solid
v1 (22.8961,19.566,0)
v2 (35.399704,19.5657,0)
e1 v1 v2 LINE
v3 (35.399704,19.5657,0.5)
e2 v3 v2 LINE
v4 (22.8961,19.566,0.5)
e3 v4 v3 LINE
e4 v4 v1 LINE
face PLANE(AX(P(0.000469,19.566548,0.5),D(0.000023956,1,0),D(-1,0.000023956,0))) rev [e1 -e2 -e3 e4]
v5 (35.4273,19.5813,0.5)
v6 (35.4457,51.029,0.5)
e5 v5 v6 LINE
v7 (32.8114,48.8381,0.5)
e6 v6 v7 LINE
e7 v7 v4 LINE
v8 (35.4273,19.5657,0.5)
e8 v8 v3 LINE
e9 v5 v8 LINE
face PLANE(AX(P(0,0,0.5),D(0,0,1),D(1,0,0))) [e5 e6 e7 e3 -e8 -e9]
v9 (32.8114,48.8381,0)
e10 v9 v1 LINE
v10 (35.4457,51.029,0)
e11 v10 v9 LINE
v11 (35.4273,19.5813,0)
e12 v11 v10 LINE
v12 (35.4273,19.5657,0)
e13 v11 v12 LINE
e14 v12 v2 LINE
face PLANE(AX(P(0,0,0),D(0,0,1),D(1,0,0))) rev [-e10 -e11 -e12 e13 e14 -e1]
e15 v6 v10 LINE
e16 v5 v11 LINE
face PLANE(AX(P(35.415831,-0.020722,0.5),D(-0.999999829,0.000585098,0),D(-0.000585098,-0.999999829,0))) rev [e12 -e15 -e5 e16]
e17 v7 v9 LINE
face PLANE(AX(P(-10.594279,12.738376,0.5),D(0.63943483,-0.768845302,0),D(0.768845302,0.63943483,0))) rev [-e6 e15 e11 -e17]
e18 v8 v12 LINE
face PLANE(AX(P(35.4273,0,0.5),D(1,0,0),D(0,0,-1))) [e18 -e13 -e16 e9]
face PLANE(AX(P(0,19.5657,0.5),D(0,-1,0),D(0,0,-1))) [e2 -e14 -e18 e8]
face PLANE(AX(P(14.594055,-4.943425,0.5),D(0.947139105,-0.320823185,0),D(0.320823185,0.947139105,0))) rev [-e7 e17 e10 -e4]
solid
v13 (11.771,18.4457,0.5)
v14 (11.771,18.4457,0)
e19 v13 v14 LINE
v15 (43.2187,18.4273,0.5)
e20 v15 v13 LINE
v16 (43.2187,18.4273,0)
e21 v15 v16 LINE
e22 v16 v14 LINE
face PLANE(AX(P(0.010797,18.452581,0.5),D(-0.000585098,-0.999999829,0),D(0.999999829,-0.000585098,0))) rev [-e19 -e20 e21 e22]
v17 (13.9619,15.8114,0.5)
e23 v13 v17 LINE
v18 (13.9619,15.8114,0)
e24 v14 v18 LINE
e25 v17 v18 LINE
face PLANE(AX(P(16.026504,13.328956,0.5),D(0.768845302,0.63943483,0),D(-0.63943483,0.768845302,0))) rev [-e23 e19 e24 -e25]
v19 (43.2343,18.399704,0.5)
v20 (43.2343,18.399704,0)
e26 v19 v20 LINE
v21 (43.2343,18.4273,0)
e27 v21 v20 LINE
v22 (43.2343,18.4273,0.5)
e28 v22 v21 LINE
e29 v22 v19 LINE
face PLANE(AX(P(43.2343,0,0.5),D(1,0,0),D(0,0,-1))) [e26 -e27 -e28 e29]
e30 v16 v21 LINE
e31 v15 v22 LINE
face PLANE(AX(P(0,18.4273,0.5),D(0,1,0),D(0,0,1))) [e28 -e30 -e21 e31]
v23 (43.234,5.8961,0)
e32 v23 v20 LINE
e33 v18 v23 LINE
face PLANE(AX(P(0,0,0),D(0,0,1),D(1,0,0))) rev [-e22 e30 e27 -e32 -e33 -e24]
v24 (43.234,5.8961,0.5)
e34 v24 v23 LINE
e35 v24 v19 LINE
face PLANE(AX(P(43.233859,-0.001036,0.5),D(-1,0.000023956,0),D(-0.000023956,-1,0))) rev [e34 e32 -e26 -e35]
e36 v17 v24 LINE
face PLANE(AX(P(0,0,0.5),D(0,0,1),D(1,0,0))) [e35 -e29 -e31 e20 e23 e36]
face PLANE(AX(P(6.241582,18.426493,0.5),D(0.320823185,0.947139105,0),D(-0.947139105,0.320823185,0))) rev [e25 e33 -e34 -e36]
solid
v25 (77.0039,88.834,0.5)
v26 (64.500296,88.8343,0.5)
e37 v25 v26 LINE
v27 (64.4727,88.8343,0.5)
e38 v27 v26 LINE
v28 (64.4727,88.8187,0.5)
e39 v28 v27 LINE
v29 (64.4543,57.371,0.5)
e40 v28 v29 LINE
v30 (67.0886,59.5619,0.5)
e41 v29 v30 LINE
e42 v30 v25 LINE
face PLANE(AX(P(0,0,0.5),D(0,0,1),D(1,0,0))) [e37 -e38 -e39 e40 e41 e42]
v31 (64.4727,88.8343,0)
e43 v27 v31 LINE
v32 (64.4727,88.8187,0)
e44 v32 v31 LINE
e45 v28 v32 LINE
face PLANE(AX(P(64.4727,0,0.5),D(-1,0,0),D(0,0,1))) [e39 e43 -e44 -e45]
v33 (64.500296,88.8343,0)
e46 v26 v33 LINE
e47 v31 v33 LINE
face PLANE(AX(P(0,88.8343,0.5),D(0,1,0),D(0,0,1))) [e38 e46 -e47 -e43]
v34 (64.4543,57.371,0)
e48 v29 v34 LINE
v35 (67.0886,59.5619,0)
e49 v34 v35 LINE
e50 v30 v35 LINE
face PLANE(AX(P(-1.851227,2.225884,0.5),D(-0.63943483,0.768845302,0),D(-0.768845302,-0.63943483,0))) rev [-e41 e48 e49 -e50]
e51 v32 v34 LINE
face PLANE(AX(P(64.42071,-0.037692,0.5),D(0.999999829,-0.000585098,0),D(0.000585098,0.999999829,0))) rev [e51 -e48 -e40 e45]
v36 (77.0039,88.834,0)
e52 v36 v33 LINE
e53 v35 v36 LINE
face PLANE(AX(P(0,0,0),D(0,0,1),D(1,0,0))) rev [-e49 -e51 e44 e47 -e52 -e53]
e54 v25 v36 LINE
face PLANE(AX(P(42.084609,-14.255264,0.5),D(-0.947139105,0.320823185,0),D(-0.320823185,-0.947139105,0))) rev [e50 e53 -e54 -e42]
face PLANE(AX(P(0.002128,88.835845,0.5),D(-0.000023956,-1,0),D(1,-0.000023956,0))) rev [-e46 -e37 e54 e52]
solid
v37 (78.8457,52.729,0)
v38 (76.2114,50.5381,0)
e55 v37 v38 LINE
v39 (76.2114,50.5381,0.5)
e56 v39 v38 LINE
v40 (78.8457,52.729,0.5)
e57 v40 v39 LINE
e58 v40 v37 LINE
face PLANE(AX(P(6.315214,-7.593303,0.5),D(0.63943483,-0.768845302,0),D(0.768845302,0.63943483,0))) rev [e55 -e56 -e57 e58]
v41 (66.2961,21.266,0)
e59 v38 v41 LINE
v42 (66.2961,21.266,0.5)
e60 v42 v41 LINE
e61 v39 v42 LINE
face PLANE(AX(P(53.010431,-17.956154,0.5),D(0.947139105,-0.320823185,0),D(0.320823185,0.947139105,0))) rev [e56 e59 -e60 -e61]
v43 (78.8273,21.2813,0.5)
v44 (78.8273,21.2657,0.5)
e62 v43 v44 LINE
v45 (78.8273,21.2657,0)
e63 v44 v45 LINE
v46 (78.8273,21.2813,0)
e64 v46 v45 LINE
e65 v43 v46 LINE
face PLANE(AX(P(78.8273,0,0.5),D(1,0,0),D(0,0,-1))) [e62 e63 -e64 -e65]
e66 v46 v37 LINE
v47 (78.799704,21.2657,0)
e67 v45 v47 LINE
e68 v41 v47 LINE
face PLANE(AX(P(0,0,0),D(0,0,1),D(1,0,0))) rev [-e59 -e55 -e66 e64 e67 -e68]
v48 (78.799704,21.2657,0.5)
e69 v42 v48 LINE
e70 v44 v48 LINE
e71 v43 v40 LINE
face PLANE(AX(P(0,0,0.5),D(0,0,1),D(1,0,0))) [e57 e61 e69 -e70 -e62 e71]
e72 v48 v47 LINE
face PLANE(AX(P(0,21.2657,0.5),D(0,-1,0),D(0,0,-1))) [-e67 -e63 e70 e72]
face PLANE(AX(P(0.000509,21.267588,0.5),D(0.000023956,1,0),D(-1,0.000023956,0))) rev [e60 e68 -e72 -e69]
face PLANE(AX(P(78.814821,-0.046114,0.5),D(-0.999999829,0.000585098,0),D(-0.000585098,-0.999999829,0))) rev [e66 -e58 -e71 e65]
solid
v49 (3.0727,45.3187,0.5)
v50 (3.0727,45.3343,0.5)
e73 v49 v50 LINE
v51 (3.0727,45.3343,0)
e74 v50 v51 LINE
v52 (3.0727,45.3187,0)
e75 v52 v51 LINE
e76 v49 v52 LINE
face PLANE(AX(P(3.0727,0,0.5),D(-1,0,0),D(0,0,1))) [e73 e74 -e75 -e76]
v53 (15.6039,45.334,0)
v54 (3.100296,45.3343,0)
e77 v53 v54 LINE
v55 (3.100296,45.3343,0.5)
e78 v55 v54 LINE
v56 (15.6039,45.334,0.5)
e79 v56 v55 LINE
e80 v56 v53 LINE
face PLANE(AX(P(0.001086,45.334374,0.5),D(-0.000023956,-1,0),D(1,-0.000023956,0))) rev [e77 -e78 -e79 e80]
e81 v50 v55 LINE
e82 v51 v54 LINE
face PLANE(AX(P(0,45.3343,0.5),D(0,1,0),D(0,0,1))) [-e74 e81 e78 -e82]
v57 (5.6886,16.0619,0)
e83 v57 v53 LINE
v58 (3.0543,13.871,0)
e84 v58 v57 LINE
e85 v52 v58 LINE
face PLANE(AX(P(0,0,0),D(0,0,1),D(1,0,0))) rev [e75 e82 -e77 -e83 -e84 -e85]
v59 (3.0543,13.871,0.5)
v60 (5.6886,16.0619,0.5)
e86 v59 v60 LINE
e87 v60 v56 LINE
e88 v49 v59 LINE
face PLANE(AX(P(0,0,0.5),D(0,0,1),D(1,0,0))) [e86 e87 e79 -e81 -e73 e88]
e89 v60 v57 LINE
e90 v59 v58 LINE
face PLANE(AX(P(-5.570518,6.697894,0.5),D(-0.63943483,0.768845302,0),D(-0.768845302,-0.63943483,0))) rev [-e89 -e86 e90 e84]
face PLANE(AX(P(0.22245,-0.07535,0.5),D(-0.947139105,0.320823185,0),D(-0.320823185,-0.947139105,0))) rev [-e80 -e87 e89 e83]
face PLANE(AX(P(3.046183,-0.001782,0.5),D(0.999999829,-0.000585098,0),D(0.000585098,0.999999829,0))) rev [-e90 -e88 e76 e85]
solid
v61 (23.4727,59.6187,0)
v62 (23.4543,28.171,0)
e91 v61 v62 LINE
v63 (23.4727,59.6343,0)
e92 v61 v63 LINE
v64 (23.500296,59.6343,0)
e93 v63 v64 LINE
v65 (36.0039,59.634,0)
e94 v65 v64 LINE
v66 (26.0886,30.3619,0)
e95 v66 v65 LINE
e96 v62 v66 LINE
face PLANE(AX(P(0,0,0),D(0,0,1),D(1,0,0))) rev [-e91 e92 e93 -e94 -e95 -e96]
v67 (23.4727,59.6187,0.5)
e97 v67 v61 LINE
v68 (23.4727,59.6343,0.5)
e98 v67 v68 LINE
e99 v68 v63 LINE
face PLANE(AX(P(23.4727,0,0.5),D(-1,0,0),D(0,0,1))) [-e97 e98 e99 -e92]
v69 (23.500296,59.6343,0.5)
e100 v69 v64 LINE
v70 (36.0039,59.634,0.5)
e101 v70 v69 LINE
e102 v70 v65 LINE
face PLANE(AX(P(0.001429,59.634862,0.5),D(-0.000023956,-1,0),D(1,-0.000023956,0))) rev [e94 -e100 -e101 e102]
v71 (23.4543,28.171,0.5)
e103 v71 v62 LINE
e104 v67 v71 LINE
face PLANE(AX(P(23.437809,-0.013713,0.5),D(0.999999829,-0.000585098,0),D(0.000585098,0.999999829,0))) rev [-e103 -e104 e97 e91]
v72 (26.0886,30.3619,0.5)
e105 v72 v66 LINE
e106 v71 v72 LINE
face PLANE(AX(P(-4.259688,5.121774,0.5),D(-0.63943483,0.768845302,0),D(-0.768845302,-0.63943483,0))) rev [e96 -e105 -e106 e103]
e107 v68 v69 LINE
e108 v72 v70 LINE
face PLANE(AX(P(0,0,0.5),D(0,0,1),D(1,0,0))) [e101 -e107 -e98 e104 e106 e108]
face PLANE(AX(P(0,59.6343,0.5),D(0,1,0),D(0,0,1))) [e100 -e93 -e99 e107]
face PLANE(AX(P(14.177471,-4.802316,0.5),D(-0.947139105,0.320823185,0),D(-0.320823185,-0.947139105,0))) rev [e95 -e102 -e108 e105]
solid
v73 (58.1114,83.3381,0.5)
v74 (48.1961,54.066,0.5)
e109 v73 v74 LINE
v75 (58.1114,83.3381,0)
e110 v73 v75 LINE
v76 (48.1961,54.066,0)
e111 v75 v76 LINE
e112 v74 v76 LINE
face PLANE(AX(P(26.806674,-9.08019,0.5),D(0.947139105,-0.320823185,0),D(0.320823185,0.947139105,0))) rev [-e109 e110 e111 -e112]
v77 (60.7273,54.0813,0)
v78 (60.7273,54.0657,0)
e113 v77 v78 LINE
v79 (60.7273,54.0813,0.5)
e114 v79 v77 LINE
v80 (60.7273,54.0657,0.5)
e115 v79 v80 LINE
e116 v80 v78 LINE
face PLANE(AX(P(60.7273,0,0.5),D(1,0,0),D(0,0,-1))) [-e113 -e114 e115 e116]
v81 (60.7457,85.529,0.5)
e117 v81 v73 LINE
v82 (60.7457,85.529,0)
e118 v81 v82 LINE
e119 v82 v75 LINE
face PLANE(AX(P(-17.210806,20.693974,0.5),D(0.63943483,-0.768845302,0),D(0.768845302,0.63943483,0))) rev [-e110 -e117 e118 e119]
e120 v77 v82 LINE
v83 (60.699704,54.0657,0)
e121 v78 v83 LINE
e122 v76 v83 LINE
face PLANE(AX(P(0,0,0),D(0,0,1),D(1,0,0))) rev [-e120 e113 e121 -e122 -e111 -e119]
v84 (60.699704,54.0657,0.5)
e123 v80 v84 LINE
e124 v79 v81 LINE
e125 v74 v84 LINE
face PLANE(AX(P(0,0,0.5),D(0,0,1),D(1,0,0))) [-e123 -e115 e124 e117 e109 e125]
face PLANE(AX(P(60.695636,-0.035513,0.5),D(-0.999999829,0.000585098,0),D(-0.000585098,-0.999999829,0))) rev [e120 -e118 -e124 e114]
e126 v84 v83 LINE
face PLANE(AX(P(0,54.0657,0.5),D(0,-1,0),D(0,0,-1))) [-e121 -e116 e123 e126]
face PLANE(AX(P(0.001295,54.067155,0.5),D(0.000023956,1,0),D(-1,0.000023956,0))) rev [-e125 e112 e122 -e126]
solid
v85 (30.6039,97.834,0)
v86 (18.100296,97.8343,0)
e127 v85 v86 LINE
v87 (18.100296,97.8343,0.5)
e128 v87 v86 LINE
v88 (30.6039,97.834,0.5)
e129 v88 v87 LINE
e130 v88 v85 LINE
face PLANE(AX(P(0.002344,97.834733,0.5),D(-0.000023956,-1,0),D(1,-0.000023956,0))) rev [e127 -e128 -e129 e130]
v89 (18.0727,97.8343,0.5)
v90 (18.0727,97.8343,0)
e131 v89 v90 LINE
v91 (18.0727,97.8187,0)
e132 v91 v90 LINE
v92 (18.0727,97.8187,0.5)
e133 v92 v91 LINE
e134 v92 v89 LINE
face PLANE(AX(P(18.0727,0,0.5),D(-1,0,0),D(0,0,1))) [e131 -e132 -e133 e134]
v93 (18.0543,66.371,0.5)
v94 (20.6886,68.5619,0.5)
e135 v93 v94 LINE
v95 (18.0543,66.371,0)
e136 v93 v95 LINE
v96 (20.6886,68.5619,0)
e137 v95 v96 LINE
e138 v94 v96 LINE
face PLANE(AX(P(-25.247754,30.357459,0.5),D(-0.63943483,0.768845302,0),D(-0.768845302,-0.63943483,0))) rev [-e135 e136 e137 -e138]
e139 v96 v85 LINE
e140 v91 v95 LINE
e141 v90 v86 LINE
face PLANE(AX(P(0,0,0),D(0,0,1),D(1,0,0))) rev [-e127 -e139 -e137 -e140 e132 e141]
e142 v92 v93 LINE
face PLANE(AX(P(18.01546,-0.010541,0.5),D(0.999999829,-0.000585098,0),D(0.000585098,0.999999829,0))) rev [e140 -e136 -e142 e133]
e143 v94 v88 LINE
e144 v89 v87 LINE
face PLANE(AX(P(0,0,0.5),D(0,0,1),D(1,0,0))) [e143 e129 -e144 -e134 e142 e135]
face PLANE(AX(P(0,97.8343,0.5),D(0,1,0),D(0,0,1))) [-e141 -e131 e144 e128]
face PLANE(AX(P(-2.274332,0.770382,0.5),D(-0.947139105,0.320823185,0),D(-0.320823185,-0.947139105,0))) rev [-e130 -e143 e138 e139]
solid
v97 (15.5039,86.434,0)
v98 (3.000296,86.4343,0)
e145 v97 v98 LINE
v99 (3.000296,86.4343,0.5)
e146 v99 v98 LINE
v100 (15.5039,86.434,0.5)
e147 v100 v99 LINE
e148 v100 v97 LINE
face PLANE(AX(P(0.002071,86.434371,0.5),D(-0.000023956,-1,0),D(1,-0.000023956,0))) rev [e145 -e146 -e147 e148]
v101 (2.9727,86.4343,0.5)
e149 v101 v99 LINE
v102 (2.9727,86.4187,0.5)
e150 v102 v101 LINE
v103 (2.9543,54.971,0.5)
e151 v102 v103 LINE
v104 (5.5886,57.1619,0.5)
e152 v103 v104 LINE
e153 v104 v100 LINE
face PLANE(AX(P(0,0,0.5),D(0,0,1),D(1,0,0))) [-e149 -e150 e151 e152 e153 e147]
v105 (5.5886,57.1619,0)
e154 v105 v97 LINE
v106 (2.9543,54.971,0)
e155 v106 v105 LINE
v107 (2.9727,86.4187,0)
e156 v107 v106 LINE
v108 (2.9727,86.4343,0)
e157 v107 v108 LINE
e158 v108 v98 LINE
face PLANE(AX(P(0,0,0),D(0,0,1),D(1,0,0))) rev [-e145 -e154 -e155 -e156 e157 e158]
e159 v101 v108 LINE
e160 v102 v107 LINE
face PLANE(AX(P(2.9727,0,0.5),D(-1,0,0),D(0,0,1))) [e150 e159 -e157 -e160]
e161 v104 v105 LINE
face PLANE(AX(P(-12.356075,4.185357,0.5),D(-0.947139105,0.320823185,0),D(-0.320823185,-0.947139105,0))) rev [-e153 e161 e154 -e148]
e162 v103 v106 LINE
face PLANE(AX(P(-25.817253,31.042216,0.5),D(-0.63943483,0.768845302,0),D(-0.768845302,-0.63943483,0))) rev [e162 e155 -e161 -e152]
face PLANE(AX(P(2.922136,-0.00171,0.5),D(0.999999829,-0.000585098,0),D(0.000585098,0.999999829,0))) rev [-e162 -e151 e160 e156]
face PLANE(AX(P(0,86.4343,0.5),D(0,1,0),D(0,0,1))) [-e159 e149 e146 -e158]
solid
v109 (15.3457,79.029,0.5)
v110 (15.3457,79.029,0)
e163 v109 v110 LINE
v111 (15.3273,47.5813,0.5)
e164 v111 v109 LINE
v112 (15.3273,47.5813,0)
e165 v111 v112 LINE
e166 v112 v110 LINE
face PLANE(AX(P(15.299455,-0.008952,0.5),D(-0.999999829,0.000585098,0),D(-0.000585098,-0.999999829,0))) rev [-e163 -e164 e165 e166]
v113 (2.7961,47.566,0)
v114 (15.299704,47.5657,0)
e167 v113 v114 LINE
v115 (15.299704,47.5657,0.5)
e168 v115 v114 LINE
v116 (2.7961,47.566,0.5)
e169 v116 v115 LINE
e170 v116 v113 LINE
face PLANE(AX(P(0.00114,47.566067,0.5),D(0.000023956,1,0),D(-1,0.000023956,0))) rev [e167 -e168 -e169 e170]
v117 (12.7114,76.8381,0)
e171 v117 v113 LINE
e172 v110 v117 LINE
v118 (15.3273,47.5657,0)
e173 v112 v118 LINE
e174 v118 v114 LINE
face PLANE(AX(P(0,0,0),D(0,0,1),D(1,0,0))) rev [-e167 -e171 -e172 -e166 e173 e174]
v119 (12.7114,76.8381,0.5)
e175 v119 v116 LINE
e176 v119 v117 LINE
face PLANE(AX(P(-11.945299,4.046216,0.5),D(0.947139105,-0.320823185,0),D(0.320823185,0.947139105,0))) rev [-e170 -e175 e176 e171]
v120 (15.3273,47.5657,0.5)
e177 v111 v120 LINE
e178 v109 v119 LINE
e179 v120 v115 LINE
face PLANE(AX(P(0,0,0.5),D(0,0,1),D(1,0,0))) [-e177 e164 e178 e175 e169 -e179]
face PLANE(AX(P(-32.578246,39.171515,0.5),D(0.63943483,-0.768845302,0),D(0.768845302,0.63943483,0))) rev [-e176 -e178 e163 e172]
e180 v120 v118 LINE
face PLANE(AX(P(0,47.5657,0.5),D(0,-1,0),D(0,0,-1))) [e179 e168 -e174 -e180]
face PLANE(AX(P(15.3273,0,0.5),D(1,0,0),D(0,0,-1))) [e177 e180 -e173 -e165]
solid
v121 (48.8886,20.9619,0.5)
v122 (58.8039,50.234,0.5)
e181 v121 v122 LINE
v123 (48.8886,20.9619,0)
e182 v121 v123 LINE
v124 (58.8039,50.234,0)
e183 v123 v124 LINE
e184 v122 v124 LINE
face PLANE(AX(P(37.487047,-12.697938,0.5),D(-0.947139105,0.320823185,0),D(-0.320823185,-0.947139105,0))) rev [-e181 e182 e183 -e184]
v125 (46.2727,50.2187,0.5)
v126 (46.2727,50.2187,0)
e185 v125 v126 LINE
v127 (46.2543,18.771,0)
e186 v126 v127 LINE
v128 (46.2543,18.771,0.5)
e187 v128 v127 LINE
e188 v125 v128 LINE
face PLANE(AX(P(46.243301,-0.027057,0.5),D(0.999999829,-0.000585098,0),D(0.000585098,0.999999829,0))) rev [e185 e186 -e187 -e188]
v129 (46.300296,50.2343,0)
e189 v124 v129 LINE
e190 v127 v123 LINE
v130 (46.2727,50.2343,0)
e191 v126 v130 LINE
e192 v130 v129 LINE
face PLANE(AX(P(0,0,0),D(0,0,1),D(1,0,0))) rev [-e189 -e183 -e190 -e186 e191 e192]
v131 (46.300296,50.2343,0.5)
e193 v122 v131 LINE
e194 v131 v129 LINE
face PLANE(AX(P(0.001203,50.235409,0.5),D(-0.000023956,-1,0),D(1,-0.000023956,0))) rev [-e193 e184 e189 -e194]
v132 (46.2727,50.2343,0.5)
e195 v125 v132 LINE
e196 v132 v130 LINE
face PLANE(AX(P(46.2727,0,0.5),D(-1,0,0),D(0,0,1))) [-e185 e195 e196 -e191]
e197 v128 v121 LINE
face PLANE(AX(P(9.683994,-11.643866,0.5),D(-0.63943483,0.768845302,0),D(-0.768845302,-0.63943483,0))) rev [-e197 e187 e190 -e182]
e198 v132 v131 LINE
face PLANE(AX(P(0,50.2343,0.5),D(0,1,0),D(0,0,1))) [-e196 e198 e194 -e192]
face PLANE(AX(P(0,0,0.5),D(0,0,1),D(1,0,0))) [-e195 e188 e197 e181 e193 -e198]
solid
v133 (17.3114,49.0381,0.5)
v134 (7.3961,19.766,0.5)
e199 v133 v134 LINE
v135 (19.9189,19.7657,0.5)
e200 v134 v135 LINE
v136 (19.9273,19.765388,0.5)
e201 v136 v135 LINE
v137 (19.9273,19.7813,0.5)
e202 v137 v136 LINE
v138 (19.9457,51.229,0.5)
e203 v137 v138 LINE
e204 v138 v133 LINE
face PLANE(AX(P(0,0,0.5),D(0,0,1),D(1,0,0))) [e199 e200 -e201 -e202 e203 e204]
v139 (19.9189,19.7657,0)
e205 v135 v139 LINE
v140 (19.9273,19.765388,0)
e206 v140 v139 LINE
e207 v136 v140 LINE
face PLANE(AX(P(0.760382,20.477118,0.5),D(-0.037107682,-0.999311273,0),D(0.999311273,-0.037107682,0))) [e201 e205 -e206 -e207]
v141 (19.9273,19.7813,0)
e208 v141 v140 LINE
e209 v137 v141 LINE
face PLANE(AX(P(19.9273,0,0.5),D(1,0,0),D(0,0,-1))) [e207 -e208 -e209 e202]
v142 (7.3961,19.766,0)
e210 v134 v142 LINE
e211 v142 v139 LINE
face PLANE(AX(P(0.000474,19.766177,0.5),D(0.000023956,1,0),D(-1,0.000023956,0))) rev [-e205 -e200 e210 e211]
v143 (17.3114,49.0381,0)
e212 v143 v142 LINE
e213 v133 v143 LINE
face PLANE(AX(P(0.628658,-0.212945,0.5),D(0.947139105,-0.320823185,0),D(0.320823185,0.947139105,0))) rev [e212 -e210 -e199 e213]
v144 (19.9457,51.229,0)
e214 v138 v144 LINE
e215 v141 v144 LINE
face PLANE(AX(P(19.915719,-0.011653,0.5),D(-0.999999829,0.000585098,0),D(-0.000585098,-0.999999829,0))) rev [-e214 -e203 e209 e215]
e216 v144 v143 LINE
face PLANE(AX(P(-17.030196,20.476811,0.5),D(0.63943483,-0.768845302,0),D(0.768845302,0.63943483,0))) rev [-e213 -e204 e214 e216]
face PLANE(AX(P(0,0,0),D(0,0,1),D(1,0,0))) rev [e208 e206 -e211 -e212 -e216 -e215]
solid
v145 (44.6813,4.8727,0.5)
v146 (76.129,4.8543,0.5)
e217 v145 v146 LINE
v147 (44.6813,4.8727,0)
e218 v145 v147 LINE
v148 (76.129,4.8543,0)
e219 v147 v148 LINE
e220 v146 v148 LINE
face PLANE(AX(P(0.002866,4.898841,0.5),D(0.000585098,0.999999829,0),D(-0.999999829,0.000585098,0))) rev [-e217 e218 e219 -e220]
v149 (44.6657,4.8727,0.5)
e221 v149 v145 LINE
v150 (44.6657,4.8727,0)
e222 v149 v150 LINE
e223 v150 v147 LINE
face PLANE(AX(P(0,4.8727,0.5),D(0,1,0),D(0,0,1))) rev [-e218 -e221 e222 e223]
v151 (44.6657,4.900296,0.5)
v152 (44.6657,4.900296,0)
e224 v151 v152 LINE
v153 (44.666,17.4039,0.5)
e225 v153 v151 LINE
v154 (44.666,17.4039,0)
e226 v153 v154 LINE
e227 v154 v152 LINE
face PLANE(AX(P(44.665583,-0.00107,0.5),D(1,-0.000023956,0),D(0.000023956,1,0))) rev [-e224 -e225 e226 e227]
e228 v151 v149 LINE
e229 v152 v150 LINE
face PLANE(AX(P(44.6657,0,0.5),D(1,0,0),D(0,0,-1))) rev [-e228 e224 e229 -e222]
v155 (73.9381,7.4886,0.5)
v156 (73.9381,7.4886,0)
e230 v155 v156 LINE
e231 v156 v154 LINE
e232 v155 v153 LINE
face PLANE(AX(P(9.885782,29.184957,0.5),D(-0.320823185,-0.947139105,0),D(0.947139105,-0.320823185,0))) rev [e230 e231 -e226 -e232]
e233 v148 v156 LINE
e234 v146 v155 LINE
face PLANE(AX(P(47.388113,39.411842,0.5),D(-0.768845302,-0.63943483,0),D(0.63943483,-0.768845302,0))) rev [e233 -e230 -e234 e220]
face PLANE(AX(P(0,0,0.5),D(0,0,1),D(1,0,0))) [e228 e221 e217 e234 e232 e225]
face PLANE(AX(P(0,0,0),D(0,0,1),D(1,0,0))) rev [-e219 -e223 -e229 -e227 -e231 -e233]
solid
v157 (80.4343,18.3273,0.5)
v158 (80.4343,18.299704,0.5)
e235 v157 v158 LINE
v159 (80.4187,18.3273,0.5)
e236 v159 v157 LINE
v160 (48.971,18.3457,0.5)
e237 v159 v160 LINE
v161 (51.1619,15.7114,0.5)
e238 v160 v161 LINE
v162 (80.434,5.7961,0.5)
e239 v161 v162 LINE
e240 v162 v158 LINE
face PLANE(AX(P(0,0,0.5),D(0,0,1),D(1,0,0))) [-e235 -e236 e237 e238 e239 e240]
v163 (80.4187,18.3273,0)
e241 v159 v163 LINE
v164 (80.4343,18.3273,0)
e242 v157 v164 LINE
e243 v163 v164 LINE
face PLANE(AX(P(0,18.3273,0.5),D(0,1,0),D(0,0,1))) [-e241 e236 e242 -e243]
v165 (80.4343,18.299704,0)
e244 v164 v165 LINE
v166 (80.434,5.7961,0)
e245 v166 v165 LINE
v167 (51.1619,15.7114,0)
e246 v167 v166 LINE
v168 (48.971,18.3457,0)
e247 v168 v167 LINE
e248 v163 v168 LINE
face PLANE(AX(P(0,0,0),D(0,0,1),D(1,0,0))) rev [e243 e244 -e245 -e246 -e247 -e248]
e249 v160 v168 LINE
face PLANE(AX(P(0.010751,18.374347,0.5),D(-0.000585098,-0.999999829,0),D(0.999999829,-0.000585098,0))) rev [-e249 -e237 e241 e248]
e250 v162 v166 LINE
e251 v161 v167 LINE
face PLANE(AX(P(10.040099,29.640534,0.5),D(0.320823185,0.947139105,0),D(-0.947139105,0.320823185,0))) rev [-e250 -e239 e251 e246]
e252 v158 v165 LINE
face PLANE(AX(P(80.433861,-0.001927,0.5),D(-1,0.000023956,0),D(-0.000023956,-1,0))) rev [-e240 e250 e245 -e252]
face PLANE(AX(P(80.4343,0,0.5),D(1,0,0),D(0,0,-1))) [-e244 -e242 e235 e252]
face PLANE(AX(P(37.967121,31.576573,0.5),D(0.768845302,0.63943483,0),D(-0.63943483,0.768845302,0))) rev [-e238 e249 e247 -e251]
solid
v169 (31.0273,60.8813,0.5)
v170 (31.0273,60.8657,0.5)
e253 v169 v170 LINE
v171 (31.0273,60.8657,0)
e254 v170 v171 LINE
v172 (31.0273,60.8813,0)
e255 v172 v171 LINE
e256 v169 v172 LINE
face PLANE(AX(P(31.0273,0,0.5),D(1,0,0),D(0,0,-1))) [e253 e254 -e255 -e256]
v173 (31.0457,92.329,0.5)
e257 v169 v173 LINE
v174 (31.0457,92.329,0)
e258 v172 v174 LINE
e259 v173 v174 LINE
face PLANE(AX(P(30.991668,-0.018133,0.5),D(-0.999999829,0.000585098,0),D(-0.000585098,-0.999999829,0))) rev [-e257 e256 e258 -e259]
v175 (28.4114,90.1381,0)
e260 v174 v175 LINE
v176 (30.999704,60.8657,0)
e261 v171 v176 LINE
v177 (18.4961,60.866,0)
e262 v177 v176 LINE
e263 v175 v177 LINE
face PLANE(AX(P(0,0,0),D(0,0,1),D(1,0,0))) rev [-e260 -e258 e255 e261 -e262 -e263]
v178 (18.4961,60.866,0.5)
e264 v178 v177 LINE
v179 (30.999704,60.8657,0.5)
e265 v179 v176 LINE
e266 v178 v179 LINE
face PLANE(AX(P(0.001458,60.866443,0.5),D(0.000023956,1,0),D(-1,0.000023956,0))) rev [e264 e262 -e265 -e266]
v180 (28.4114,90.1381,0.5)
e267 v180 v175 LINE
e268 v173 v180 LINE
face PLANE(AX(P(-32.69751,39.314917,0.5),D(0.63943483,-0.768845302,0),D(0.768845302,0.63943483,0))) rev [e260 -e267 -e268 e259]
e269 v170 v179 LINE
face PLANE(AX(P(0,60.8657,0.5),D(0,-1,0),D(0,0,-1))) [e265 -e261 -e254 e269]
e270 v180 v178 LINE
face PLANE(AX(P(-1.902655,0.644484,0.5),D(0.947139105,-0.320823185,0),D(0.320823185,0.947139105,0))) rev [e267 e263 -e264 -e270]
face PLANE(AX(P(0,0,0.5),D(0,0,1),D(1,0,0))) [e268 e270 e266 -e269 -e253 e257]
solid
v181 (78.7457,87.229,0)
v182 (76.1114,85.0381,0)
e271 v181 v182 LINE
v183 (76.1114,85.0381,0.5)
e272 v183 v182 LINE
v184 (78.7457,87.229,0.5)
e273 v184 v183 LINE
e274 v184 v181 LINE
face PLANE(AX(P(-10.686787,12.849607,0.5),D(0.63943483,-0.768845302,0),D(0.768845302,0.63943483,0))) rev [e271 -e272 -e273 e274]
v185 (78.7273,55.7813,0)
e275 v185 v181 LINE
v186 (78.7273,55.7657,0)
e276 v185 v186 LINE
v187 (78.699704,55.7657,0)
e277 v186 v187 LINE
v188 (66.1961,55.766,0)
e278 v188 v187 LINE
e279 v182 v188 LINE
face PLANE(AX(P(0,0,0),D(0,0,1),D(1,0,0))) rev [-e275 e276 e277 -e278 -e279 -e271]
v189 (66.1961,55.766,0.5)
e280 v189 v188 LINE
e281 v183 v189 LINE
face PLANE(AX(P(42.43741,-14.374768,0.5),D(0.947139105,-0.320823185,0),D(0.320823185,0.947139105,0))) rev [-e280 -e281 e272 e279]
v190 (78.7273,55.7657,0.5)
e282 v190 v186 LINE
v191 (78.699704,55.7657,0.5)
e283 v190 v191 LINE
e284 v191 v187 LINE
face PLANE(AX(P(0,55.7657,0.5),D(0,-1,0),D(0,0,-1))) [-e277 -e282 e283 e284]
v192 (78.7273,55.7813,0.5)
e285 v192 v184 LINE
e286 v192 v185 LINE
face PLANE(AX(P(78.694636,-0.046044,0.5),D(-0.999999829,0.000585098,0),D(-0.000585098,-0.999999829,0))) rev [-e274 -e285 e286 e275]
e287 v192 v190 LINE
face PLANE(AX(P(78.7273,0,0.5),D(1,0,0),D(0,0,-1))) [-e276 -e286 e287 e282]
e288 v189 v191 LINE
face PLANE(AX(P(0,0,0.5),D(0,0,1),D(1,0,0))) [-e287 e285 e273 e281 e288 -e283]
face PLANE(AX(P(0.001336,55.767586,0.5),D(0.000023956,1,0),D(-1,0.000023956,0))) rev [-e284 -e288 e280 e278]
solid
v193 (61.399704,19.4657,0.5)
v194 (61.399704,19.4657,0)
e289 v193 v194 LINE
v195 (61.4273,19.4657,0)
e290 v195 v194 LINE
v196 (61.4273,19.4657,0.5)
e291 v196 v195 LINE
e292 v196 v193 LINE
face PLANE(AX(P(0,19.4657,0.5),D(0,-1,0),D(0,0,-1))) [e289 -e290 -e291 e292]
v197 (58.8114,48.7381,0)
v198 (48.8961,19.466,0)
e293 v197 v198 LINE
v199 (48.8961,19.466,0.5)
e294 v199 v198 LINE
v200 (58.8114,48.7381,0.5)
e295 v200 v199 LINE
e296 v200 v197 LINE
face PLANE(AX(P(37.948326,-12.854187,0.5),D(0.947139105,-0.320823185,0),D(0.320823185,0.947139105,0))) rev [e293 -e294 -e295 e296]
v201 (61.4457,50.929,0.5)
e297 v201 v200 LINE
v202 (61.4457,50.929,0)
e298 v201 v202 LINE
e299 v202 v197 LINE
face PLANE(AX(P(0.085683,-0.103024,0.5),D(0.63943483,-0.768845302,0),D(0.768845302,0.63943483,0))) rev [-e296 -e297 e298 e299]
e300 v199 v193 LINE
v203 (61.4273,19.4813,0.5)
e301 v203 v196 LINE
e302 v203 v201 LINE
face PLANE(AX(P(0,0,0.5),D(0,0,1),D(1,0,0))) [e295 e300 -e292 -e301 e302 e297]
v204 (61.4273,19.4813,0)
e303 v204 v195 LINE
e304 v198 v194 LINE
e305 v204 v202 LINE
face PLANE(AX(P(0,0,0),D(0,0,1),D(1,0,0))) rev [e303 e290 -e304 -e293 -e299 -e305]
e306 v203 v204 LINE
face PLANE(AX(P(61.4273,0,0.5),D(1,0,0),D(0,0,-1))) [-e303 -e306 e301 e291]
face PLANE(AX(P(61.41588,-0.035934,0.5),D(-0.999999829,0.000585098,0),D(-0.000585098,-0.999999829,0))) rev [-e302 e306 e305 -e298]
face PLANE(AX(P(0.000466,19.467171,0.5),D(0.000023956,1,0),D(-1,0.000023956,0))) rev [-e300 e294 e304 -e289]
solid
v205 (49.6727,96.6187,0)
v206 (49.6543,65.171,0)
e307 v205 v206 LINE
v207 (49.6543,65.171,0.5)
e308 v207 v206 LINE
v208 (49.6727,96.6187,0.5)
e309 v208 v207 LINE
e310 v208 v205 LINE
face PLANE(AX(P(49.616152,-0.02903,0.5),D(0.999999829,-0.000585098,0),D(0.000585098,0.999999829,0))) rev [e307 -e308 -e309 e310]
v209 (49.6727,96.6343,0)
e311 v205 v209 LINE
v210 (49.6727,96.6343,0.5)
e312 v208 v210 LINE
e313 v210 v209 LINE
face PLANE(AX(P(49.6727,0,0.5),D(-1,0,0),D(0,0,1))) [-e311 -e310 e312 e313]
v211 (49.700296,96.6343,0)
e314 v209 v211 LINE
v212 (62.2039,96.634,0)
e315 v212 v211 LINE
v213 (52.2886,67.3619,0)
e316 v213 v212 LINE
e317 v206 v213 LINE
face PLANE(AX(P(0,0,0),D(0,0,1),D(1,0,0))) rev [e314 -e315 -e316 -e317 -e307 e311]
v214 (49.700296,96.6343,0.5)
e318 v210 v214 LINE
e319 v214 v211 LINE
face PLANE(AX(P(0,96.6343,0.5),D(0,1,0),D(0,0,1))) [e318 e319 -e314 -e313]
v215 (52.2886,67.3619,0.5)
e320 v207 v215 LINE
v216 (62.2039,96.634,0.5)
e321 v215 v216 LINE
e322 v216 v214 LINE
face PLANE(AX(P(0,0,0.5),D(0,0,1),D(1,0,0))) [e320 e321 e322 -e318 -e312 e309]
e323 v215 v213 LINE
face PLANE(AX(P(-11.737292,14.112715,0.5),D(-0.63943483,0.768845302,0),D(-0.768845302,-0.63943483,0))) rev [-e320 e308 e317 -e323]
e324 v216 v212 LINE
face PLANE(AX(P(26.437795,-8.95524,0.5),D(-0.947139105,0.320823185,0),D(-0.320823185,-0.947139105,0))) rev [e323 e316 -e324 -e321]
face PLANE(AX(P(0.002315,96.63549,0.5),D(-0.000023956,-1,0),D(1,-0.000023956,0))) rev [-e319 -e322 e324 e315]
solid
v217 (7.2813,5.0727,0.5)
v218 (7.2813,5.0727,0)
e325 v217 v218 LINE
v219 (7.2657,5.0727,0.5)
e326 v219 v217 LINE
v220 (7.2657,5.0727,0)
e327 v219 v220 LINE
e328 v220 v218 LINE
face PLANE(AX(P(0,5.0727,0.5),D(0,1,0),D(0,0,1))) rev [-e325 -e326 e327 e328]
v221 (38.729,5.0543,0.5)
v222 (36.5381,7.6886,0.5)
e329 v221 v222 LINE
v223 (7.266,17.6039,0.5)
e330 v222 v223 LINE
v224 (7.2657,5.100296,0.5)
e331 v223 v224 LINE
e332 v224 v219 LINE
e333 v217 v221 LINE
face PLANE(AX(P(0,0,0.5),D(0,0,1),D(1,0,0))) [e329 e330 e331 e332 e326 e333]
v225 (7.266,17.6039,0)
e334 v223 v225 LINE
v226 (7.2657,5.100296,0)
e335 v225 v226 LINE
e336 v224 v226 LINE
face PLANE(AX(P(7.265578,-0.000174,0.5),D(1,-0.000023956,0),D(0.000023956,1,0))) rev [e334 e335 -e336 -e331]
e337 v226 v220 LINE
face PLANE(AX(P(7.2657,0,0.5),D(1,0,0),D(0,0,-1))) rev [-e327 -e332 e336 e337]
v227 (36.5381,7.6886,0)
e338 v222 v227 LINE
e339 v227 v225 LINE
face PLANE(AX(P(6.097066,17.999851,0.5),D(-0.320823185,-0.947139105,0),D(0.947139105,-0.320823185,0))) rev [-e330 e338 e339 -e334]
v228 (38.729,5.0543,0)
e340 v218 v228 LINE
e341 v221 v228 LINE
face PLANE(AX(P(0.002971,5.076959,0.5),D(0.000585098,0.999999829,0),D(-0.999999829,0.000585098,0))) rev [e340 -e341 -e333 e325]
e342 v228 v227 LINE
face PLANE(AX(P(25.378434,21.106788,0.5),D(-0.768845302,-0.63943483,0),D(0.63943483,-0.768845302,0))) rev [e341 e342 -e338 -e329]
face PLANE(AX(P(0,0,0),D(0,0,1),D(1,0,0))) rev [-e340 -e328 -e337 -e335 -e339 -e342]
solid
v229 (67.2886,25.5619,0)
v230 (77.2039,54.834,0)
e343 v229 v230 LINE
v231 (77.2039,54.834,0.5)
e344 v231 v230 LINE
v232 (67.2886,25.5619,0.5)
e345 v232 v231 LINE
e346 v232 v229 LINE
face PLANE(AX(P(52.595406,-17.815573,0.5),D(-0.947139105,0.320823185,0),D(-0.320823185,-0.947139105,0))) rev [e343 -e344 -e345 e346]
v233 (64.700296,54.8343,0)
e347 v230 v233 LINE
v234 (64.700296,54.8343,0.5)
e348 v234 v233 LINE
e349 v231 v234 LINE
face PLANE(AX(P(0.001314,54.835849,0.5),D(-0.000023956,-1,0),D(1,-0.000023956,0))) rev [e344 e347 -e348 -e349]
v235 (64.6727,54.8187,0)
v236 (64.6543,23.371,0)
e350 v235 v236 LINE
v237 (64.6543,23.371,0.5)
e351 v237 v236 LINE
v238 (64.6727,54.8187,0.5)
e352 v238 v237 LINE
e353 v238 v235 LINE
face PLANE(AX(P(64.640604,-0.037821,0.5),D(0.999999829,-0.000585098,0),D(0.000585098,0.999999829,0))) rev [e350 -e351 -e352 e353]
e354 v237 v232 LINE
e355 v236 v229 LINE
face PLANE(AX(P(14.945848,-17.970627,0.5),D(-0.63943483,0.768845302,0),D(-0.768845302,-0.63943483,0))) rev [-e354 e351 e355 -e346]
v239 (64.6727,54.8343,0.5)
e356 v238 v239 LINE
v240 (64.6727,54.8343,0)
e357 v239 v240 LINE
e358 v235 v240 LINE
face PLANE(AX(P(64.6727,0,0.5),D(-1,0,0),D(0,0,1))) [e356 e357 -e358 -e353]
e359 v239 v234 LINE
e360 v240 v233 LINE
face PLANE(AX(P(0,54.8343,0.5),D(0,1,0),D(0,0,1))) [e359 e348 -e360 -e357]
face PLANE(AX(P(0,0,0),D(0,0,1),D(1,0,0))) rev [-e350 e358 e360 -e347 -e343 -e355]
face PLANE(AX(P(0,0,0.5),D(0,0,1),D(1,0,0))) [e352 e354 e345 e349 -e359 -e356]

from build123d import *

# Parameters (mm, degrees)
BOSS_EXTRUDE1_DEPTH    = 0.5
BOSS_EXTRUDE1_2_DEPTH  = 0.5
BOSS_EXTRUDE1_3_DEPTH  = 0.5
BOSS_EXTRUDE1_4_DEPTH  = 0.5
BOSS_EXTRUDE1_5_DEPTH  = 0.5
BOSS_EXTRUDE1_6_DEPTH  = 0.5
BOSS_EXTRUDE1_7_DEPTH  = 0.5
BOSS_EXTRUDE1_8_DEPTH  = 0.5
BOSS_EXTRUDE1_9_DEPTH  = 0.5
BOSS_EXTRUDE1_10_DEPTH = 0.5
BOSS_EXTRUDE1_11_DEPTH = 0.5
BOSS_EXTRUDE1_12_DEPTH = 0.5
BOSS_EXTRUDE1_13_DEPTH = 0.5
BOSS_EXTRUDE1_14_DEPTH = 0.5
BOSS_EXTRUDE1_15_DEPTH = 0.5
BOSS_EXTRUDE1_16_DEPTH = 0.5
BOSS_EXTRUDE1_17_DEPTH = 0.5
BOSS_EXTRUDE1_18_DEPTH = 0.5
BOSS_EXTRUDE1_19_DEPTH = 0.5
BOSS_EXTRUDE1_20_DEPTH = 0.5


with BuildPart() as part:
    # Model → Boss-Extrude1 (new body)
    with BuildSketch(Plane.XY):
        Polygon((18.0727, 97.8343), (18.0727, 97.8187), (18.072691244, 97.803735595), (18.0543, 66.371), (20.664165109, 68.54157794), (20.6886, 68.5619), (20.698783041, 68.591962529), (30.6039, 97.834), (18.100296093, 97.83429954), (18.0811, 97.8343), align=None)
    extrude(amount=BOSS_EXTRUDE1_DEPTH)


with BuildPart() as body_2:
    # Model → Boss-Extrude1 2 (new body)
    with BuildSketch(Plane.XY):
        Polygon((31.0273, 60.8657), (31.0273, 60.8813), (31.027308756, 60.896264405), (31.0457, 92.329), (28.435834891, 90.15842206), (28.4114, 90.1381), (28.401216959, 90.108037471), (18.4961, 60.866), (30.999703907, 60.86570046), (31.0189, 60.8657), align=None)
    extrude(amount=BOSS_EXTRUDE1_2_DEPTH)


with BuildPart() as body_3:
    # Model → Boss-Extrude1 3 (new body)
    with BuildSketch(Plane.XY):
        Polygon((2.9727, 86.4343), (2.9727, 86.4187), (2.972691244, 86.403735595), (2.9543, 54.971), (5.564165109, 57.14157794), (5.5886, 57.1619), (5.598783041, 57.191962529), (15.5039, 86.434), (3.000296093, 86.43429954), (2.9811, 86.4343), align=None)
    extrude(amount=BOSS_EXTRUDE1_3_DEPTH)


with BuildPart() as body_4:
    # Model → Boss-Extrude1 4 (new body)
    with BuildSketch(Plane.XY):
        Polygon((15.3273, 47.5657), (15.3273, 47.5813), (15.327308756, 47.596264405), (15.3457, 79.029), (12.735834891, 76.85842206), (12.7114, 76.8381), (12.701216959, 76.808037471), (2.7961, 47.566), (15.299703907, 47.56570046), (15.3189, 47.5657), align=None)
    extrude(amount=BOSS_EXTRUDE1_4_DEPTH)


with BuildPart() as body_5:
    # Model → Boss-Extrude1 5 (new body)
    with BuildSketch(Plane.XY):
        Polygon((23.4727, 59.6343), (23.4727, 59.6187), (23.472691244, 59.603735595), (23.4543, 28.171), (26.064165109, 30.34157794), (26.0886, 30.3619), (26.098783041, 30.391962529), (36.0039, 59.634), (23.500296093, 59.63429954), (23.4811, 59.6343), align=None)
    extrude(amount=BOSS_EXTRUDE1_5_DEPTH)


with BuildPart() as body_6:
    # Model → Boss-Extrude1 6 (new body)
    with BuildSketch(Plane.XY):
        Polygon((35.4273, 19.5657), (35.4273, 19.5813), (35.427308756, 19.596264405), (35.4457, 51.029), (32.835834891, 48.85842206), (32.8114, 48.8381), (32.801216959, 48.808037471), (22.8961, 19.566), (35.399703907, 19.56570046), (35.4189, 19.5657), align=None)
    extrude(amount=BOSS_EXTRUDE1_6_DEPTH)


with BuildPart() as body_7:
    # Model → Boss-Extrude1 7 (new body)
    with BuildSketch(Plane.XY):
        Polygon((19.9273, 19.765388081), (19.9273, 19.7813), (19.927308756, 19.796264405), (19.9457, 51.229), (17.335834891, 49.05842206), (17.3114, 49.0381), (17.301216959, 49.008037471), (7.3961, 19.766), (19.899703907, 19.76570046), (19.9189, 19.7657), align=None)
    extrude(amount=BOSS_EXTRUDE1_7_DEPTH)


with BuildPart() as body_8:
    # Model → Boss-Extrude1 8 (new body)
    with BuildSketch(Plane.XY):
        Polygon((3.0727, 45.3343), (3.0727, 45.3187), (3.072691244, 45.303735595), (3.0543, 13.871), (5.664165109, 16.04157794), (5.6886, 16.0619), (5.698783041, 16.091962529), (15.6039, 45.334), (3.100296093, 45.33429954), (3.0811, 45.3343), align=None)
    extrude(amount=BOSS_EXTRUDE1_8_DEPTH)


with BuildPart() as body_9:
    # Model → Boss-Extrude1 9 (new body)
    with BuildSketch(Plane.XY):
        Polygon((43.2343, 18.4273), (43.2187, 18.4273), (43.203735595, 18.427308756), (11.771, 18.4457), (13.94157794, 15.835834891), (13.9619, 15.8114), (13.991962529, 15.801216959), (43.234, 5.8961), (43.23429954, 18.399703907), (43.2343, 18.4189), align=None)
    extrude(amount=BOSS_EXTRUDE1_9_DEPTH)


with BuildPart() as body_10:
    # Model → Boss-Extrude1 10 (new body)
    with BuildSketch(Plane.XY):
        Polygon((7.2657, 5.0727), (7.2813, 5.0727), (7.296264405, 5.072691244), (38.729, 5.0543), (36.55842206, 7.664165109), (36.5381, 7.6886), (36.508037471, 7.698783041), (7.266, 17.6039), (7.26570046, 5.100296093), (7.2657, 5.0811), align=None)
    extrude(amount=BOSS_EXTRUDE1_10_DEPTH)


with BuildPart() as body_11:
    # Model → Boss-Extrude1 11 (new body)
    with BuildSketch(Plane.XY):
        Polygon((49.6727, 96.6343), (49.6727, 96.6187), (49.672691244, 96.603735595), (49.6543, 65.171), (52.264165109, 67.34157794), (52.2886, 67.3619), (52.298783041, 67.391962529), (62.2039, 96.634), (49.700296093, 96.63429954), (49.6811, 96.6343), align=None)
    extrude(amount=BOSS_EXTRUDE1_11_DEPTH)


with BuildPart() as body_12:
    # Model → Boss-Extrude1 12 (new body)
    with BuildSketch(Plane.XY):
        Polygon((60.7273, 54.0657), (60.7273, 54.0813), (60.727308756, 54.096264405), (60.7457, 85.529), (58.135834891, 83.35842206), (58.1114, 83.3381), (58.101216959, 83.308037471), (48.1961, 54.066), (60.699703907, 54.06570046), (60.7189, 54.0657), align=None)
    extrude(amount=BOSS_EXTRUDE1_12_DEPTH)


with BuildPart() as body_13:
    # Model → Boss-Extrude1 13 (new body)
    with BuildSketch(Plane.XY):
        Polygon((64.4727, 88.8343), (64.4727, 88.8187), (64.472691244, 88.803735595), (64.4543, 57.371), (67.064165109, 59.54157794), (67.0886, 59.5619), (67.098783041, 59.591962529), (77.0039, 88.834), (64.500296093, 88.83429954), (64.4811, 88.8343), align=None)
    extrude(amount=BOSS_EXTRUDE1_13_DEPTH)


with BuildPart() as body_14:
    # Model → Boss-Extrude1 14 (new body)
    with BuildSketch(Plane.XY):
        Polygon((78.7273, 55.7657), (78.7273, 55.7813), (78.727308756, 55.796264405), (78.7457, 87.229), (76.135834891, 85.05842206), (76.1114, 85.0381), (76.101216959, 85.008037471), (66.1961, 55.766), (78.699703907, 55.76570046), (78.7189, 55.7657), align=None)
    extrude(amount=BOSS_EXTRUDE1_14_DEPTH)


with BuildPart() as body_15:
    # Model → Boss-Extrude1 15 (new body)
    with BuildSketch(Plane.XY):
        Polygon((64.6727, 54.8343), (64.6727, 54.8187), (64.672691244, 54.803735595), (64.6543, 23.371), (67.264165109, 25.54157794), (67.2886, 25.5619), (67.298783041, 25.591962529), (77.2039, 54.834), (64.700296093, 54.83429954), (64.6811, 54.8343), align=None)
    extrude(amount=BOSS_EXTRUDE1_15_DEPTH)


with BuildPart() as body_16:
    # Model → Boss-Extrude1 16 (new body)
    with BuildSketch(Plane.XY):
        Polygon((78.8273, 21.2657), (78.8273, 21.2813), (78.827308756, 21.296264405), (78.8457, 52.729), (76.235834891, 50.55842206), (76.2114, 50.5381), (76.201216959, 50.508037471), (66.2961, 21.266), (78.799703907, 21.26570046), (78.8189, 21.2657), align=None)
    extrude(amount=BOSS_EXTRUDE1_16_DEPTH)


with BuildPart() as body_17:
    # Model → Boss-Extrude1 17 (new body)
    with BuildSketch(Plane.XY):
        Polygon((61.4273, 19.4657), (61.4273, 19.4813), (61.427308756, 19.496264405), (61.4457, 50.929), (58.835834891, 48.75842206), (58.8114, 48.7381), (58.801216959, 48.708037471), (48.8961, 19.466), (61.399703907, 19.46570046), (61.4189, 19.4657), align=None)
    extrude(amount=BOSS_EXTRUDE1_17_DEPTH)


with BuildPart() as body_18:
    # Model → Boss-Extrude1 18 (new body)
    with BuildSketch(Plane.XY):
        Polygon((46.2727, 50.2343), (46.2727, 50.2187), (46.272691244, 50.203735595), (46.2543, 18.771), (48.864165109, 20.94157794), (48.8886, 20.9619), (48.898783041, 20.991962529), (58.8039, 50.234), (46.300296093, 50.23429954), (46.2811, 50.2343), align=None)
    extrude(amount=BOSS_EXTRUDE1_18_DEPTH)


with BuildPart() as body_19:
    # Model → Boss-Extrude1 19 (new body)
    with BuildSketch(Plane.XY):
        Polygon((80.4343, 18.3273), (80.4187, 18.3273), (80.403735595, 18.327308756), (48.971, 18.3457), (51.14157794, 15.735834891), (51.1619, 15.7114), (51.191962529, 15.701216959), (80.434, 5.7961), (80.43429954, 18.299703907), (80.4343, 18.3189), align=None)
    extrude(amount=BOSS_EXTRUDE1_19_DEPTH)


with BuildPart() as body_20:
    # Model → Boss-Extrude1 20 (new body)
    with BuildSketch(Plane.XY):
        Polygon((44.6657, 4.8727), (44.6813, 4.8727), (44.696264405, 4.872691244), (76.129, 4.8543), (73.95842206, 7.464165109), (73.9381, 7.4886), (73.908037471, 7.498783041), (44.666, 17.4039), (44.66570046, 4.900296093), (44.6657, 4.8811), align=None)
    extrude(amount=BOSS_EXTRUDE1_20_DEPTH)


solid = Compound([part.part, body_2.part, body_3.part, body_4.part, body_5.part, body_6.part, body_7.part, body_8.part, body_9.part, body_10.part, body_11.part, body_12.part, body_13.part, body_14.part, body_15.part, body_16.part, body_17.part, body_18.part, body_19.part, body_20.part])
